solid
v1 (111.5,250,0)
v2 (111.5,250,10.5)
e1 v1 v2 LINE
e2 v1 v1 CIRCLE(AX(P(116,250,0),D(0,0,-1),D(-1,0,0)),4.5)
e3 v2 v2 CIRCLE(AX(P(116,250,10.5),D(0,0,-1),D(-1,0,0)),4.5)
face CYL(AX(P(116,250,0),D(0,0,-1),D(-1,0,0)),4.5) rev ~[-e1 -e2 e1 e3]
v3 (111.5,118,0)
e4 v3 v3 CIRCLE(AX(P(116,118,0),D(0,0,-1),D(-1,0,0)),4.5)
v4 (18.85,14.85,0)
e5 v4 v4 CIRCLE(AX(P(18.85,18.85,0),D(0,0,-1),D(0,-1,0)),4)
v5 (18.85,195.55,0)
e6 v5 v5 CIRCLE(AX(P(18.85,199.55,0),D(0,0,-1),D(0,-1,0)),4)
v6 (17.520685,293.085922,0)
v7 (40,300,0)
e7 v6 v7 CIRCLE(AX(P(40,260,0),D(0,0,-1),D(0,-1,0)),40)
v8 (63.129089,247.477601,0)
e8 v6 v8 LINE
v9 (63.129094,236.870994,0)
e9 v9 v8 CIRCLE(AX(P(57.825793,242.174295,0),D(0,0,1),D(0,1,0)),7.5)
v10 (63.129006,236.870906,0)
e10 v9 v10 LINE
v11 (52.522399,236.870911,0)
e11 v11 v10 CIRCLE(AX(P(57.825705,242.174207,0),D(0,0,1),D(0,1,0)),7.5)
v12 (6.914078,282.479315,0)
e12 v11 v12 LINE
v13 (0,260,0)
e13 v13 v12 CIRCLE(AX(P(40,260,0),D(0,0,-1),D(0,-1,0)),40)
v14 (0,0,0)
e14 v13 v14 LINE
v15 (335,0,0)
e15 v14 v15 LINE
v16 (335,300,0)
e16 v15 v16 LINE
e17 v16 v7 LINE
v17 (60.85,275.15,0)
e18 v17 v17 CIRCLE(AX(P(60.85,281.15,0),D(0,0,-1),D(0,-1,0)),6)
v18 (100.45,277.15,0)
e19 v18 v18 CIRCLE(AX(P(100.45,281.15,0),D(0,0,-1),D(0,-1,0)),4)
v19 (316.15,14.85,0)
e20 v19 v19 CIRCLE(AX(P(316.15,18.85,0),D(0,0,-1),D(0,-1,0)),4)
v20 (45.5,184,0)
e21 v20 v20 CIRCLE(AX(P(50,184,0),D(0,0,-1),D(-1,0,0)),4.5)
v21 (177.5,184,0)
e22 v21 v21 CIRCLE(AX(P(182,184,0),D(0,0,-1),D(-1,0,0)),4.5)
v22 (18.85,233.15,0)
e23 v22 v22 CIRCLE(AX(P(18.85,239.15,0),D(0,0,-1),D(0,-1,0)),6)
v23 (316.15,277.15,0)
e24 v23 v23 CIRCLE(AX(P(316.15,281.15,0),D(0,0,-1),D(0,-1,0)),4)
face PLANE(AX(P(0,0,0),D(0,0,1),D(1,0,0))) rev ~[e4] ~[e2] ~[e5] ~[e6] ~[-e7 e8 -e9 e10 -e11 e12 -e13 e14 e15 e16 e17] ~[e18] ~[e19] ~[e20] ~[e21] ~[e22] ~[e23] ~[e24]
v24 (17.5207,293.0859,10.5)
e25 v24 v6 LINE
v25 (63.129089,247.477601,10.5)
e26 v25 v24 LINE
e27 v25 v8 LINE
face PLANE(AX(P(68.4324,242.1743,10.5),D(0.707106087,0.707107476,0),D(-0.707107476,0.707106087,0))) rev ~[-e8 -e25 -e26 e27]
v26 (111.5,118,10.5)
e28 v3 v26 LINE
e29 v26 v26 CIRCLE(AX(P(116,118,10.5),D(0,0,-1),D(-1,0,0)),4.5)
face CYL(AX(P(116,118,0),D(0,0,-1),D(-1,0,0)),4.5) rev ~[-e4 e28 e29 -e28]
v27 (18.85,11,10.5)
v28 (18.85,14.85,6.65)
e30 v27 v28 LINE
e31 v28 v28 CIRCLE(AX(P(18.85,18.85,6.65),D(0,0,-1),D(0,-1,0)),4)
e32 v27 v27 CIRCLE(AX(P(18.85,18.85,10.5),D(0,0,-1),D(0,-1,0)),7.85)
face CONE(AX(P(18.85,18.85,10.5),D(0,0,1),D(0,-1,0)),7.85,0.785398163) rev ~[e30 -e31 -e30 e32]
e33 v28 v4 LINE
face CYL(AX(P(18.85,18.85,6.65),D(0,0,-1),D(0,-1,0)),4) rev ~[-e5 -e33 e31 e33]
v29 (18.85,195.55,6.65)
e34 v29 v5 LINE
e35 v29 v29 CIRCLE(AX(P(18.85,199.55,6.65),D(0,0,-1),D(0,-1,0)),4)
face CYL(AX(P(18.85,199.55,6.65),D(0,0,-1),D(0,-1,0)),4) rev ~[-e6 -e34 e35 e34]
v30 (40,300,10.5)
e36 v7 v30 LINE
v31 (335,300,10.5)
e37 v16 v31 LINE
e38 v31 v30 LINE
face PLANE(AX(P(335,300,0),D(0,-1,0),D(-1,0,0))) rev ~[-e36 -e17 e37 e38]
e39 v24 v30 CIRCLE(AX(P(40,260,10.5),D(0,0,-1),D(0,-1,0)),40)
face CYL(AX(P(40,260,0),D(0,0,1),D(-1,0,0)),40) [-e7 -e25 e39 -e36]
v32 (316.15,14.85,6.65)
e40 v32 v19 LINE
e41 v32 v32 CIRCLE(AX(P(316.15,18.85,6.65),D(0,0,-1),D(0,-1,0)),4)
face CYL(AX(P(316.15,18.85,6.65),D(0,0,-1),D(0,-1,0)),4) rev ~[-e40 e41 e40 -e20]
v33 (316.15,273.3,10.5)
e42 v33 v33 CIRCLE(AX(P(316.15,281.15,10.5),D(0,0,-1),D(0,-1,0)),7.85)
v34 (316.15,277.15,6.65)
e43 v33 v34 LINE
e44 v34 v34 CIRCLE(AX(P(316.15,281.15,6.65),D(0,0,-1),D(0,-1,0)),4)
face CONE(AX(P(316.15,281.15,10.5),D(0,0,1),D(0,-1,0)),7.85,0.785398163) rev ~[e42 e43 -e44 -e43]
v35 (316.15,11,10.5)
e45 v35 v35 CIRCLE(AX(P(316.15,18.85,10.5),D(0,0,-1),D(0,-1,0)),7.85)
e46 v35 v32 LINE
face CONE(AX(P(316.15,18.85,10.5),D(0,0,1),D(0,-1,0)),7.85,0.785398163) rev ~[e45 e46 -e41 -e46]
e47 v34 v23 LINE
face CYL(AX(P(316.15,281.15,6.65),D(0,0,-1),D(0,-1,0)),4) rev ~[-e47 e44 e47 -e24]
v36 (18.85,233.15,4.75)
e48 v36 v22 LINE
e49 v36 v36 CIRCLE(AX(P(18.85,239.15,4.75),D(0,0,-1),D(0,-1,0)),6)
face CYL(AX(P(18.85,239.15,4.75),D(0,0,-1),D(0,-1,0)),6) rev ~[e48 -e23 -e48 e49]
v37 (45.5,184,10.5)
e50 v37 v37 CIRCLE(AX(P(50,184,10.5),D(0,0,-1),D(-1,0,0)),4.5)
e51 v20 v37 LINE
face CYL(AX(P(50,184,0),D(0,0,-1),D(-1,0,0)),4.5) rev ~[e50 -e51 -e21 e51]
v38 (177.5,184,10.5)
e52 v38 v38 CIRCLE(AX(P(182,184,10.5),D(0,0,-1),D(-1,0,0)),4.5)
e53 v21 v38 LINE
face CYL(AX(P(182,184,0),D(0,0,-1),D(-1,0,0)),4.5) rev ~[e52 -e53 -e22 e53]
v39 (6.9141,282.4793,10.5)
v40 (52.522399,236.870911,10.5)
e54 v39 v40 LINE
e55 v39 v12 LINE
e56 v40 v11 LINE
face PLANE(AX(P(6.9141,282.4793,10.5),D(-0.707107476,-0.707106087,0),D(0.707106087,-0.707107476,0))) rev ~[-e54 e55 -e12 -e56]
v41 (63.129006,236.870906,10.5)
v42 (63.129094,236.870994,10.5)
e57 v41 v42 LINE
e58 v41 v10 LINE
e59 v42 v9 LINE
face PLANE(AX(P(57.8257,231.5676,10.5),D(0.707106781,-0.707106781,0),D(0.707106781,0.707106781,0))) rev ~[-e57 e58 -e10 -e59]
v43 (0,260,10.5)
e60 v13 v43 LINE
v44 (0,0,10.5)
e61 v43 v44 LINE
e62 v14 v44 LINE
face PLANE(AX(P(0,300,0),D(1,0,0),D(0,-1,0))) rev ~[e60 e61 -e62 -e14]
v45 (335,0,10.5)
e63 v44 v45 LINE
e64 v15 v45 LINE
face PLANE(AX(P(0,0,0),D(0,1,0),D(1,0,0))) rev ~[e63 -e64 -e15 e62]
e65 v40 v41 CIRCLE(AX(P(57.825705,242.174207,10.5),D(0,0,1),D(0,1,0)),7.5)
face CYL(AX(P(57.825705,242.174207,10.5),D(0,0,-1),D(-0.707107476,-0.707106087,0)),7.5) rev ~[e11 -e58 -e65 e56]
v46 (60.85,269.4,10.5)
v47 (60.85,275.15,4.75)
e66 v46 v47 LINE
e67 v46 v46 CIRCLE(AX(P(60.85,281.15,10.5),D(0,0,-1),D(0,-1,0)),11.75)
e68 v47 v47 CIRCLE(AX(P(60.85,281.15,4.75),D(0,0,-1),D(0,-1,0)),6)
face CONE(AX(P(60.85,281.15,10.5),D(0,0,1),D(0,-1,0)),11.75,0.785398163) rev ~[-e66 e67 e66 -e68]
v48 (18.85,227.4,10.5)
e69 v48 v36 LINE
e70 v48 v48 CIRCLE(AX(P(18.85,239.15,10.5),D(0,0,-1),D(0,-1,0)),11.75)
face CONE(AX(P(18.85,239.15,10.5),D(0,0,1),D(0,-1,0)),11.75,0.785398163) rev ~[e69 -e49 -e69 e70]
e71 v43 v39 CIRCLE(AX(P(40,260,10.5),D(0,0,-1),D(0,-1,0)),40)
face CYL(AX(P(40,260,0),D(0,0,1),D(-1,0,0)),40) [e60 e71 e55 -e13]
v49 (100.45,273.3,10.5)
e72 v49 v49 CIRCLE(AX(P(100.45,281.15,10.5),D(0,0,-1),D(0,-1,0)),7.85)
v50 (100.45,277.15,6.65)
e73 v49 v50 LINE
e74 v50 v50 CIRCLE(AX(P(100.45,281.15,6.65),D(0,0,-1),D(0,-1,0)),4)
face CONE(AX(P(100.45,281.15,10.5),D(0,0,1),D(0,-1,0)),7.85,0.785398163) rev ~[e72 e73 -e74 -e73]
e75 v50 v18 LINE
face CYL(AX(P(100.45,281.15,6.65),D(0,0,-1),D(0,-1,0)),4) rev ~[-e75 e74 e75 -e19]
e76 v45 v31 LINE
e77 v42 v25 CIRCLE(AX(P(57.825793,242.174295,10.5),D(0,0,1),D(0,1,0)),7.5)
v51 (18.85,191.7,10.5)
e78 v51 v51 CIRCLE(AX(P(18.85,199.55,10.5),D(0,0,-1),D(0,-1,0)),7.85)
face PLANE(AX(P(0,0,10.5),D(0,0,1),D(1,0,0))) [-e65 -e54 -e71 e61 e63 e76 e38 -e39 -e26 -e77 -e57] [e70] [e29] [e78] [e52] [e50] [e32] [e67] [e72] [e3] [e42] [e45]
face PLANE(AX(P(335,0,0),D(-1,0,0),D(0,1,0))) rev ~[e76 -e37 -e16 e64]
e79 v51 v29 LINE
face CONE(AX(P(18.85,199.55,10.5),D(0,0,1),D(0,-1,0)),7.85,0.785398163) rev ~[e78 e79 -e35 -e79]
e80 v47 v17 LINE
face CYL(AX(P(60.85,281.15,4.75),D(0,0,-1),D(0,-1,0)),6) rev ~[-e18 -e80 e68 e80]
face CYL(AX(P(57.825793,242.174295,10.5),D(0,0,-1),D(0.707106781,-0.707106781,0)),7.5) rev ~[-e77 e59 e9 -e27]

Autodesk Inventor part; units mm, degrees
ref_plane "YZ Plane" through (0, 0, 0) normal (1, 0, 0) x (0, 1, 0)
ref_plane "XZ Plane" through (0, 0, 0) normal (0, 1, 0) x (-1, 0, 0)
ref_plane "XY Plane" through (0, 0, 0) normal (0, 0, 1) x (1, 0, 0)
sketch "Sketch1" plane through (0, 0, 0) normal (0, 0, 1) x (1, 0, 0)
  line L0 (0, 0) -> (335, 0)
  line L1 (335, 0) -> (335, 300)
  line L2 (335, 300) -> (0, 300)
  line L3 (0, 300) -> (0, 0)
  dimension "d0" = 335
  dimension "d1" = 300
extrude "Plate" add sketch "Sketch1" along normal blind 10.5
sketch "Sketch3" plane through (0, 0, 10.5) normal (0, 0, 1) x (1, 0, 0)
  circle A0 centre (316.15, 18.85) radius 7.85
  line L0 (335, 0) -> (335, 300) projected
  line L1 (0, 0) -> (335, 0) projected
  circle A1 centre (316.15, 18.85) radius 4
  line L2 (0, 300) -> (0, 0) projected
  line L3 (335, 300) -> (0, 300) projected
  circle A2 centre (18.85, 199.55) radius 7.85
  circle A3 centre (100.45, 281.15) radius 7.85
  point P0 (18.85, 18.85)
  point P1 (316.15, 281.15)
  dimension "d4" = 15.7
  dimension "d5" = 18.85
  dimension "d6" = 18.85
  dimension "d7" = 8
  dimension "d8" = 18.85
  dimension "d9" = 18.85
  dimension "d10" = 18.85
  dimension "d11" = 18.85
  dimension "d19" = 18.85
  dimension "d20" = 18.85
  dimension "d21" = 15.7
  dimension "d22" = 15.7
  dimension "d23" = 180.7
  dimension "d24" = 215.7
hole "Small screw" at (18.85, 18.85, 10.5) at (316.15, 281.15, 10.5) at (316.15, 18.85, 10.5) at (18.85, 199.55, 10.5) at (100.45, 281.15, 10.5) direction (0, 0, -1) diameter 8 end through all countersink diameter 15.7 countersink angle 90
sketch "Sketch4" plane through (0, 0, 10.5) normal (0, 0, 1) x (1, 0, 0)
  circle A0 centre (100.45, 281.15) radius 7.85 projected
  circle A1 centre (18.85, 199.55) radius 7.85 projected
  circle A2 centre (18.85, 239.15) radius 11.75
  circle A3 centre (60.85, 281.15) radius 11.75
  circle A4 centre (18.85, 199.55) radius 4 projected
  circle A5 centre (18.85, 199.55) radius 7.85
  point P0 (0, 0)
  dimension "d25" = 23.5
  dimension "d26" = 23.5
  dimension "d27" = 0
  dimension "d28" = 0
  dimension "d29" = 39.6
  dimension "d30" = 15.7
  dimension "d31" = 39.6
hole "Big screw" at (60.85, 281.15, 10.5) at (18.85, 239.15, 10.5) direction (0, 0, -1) diameter 12 end through all countersink diameter 23.5 countersink angle 90
fillet "Stor runding" radius 40 1 edges at (0, 300, 5.25)
sketch "Sketch6" plane through (0, 0, 10.5) normal (0, 0, 1) x (1, 0, 0)
  arc A0 (40, 300) -> (0, 260) centre (40, 260) ccw projected
  line L0 (0, 260) -> (0, 0) projected
  line L1 (0, 0) -> (335, 0) projected
  line L2 (335, 0) -> (335, 300) projected
  line L3 (335, 300) -> (40, 300) projected
  circle A1 centre (18.85, 239.15) radius 11.75 projected
  circle A2 centre (60.85, 281.15) radius 11.75 projected
  circle A3 centre (100.45, 281.15) radius 7.85 projected
  circle A4 centre (18.85, 199.55) radius 7.85 projected
  circle A5 centre (316.15, 18.85) radius 7.85 projected
  circle A6 centre (316.15, 281.15) radius 7.85 projected
  circle A7 centre (18.85, 18.85) radius 7.85 projected
  line L4 (17.5207, 293.0859) -> (6.9141, 282.4793)
  line L5 (6.9141, 282.4793) -> (57.8257, 231.5676)
  line L6 (57.8257, 231.5676) -> (68.4324, 242.1743)
  line L7 (68.4324, 242.1743) -> (17.5207, 293.0859)
  arc A8 (40, 300) -> (0, 260) centre (40, 260) ccw projected
  dimension "d40" = 15
  dimension "d41" = 72
  dimension "d42" = 135
extrude "Extrusion2" cut sketch "Sketch6" against normal up to next contours L4 A0 | L7 L6 L5 L4
fillet "Fillet2" radius 7.5 2 edges at (68.4324, 242.1743, 5.25) (57.8257, 231.5676, 5.25)
sketch "Sketch7" plane through (0, 0, 0) normal (0, 0, -1) x (-1, 0, 0)
  circle A0 centre (-116, 184) radius 74.5 projected
  circle A1 centre (-116, 250) radius 4.5 projected
  circle A2 centre (-182, 184) radius 4.5 projected
  circle A3 centre (-116, 118) radius 4.5 projected
  circle A4 centre (-116, 118) radius 4.5 projected
  circle A5 centre (-50, 184) radius 4.5 projected
  point P0 (0, 0)
extrude "Extrusion3" cut sketch "Sketch7" against normal up to next contours A1 | A2 | A3 | A5
equation "\"d5\" = d6"
equation "\"d8\" = d6"
equation "\"d9\" = d8"
equation "\"d10\" = d9"
equation "\"d11\" = d9"
equation "\"d19\" = d11"
equation "\"d20\" = d9"
equation "\"d21\" = d4"
equation "\"d22\" = d21"
equation "\"d31\" = d29"
properties part number "Mount plate UR"
